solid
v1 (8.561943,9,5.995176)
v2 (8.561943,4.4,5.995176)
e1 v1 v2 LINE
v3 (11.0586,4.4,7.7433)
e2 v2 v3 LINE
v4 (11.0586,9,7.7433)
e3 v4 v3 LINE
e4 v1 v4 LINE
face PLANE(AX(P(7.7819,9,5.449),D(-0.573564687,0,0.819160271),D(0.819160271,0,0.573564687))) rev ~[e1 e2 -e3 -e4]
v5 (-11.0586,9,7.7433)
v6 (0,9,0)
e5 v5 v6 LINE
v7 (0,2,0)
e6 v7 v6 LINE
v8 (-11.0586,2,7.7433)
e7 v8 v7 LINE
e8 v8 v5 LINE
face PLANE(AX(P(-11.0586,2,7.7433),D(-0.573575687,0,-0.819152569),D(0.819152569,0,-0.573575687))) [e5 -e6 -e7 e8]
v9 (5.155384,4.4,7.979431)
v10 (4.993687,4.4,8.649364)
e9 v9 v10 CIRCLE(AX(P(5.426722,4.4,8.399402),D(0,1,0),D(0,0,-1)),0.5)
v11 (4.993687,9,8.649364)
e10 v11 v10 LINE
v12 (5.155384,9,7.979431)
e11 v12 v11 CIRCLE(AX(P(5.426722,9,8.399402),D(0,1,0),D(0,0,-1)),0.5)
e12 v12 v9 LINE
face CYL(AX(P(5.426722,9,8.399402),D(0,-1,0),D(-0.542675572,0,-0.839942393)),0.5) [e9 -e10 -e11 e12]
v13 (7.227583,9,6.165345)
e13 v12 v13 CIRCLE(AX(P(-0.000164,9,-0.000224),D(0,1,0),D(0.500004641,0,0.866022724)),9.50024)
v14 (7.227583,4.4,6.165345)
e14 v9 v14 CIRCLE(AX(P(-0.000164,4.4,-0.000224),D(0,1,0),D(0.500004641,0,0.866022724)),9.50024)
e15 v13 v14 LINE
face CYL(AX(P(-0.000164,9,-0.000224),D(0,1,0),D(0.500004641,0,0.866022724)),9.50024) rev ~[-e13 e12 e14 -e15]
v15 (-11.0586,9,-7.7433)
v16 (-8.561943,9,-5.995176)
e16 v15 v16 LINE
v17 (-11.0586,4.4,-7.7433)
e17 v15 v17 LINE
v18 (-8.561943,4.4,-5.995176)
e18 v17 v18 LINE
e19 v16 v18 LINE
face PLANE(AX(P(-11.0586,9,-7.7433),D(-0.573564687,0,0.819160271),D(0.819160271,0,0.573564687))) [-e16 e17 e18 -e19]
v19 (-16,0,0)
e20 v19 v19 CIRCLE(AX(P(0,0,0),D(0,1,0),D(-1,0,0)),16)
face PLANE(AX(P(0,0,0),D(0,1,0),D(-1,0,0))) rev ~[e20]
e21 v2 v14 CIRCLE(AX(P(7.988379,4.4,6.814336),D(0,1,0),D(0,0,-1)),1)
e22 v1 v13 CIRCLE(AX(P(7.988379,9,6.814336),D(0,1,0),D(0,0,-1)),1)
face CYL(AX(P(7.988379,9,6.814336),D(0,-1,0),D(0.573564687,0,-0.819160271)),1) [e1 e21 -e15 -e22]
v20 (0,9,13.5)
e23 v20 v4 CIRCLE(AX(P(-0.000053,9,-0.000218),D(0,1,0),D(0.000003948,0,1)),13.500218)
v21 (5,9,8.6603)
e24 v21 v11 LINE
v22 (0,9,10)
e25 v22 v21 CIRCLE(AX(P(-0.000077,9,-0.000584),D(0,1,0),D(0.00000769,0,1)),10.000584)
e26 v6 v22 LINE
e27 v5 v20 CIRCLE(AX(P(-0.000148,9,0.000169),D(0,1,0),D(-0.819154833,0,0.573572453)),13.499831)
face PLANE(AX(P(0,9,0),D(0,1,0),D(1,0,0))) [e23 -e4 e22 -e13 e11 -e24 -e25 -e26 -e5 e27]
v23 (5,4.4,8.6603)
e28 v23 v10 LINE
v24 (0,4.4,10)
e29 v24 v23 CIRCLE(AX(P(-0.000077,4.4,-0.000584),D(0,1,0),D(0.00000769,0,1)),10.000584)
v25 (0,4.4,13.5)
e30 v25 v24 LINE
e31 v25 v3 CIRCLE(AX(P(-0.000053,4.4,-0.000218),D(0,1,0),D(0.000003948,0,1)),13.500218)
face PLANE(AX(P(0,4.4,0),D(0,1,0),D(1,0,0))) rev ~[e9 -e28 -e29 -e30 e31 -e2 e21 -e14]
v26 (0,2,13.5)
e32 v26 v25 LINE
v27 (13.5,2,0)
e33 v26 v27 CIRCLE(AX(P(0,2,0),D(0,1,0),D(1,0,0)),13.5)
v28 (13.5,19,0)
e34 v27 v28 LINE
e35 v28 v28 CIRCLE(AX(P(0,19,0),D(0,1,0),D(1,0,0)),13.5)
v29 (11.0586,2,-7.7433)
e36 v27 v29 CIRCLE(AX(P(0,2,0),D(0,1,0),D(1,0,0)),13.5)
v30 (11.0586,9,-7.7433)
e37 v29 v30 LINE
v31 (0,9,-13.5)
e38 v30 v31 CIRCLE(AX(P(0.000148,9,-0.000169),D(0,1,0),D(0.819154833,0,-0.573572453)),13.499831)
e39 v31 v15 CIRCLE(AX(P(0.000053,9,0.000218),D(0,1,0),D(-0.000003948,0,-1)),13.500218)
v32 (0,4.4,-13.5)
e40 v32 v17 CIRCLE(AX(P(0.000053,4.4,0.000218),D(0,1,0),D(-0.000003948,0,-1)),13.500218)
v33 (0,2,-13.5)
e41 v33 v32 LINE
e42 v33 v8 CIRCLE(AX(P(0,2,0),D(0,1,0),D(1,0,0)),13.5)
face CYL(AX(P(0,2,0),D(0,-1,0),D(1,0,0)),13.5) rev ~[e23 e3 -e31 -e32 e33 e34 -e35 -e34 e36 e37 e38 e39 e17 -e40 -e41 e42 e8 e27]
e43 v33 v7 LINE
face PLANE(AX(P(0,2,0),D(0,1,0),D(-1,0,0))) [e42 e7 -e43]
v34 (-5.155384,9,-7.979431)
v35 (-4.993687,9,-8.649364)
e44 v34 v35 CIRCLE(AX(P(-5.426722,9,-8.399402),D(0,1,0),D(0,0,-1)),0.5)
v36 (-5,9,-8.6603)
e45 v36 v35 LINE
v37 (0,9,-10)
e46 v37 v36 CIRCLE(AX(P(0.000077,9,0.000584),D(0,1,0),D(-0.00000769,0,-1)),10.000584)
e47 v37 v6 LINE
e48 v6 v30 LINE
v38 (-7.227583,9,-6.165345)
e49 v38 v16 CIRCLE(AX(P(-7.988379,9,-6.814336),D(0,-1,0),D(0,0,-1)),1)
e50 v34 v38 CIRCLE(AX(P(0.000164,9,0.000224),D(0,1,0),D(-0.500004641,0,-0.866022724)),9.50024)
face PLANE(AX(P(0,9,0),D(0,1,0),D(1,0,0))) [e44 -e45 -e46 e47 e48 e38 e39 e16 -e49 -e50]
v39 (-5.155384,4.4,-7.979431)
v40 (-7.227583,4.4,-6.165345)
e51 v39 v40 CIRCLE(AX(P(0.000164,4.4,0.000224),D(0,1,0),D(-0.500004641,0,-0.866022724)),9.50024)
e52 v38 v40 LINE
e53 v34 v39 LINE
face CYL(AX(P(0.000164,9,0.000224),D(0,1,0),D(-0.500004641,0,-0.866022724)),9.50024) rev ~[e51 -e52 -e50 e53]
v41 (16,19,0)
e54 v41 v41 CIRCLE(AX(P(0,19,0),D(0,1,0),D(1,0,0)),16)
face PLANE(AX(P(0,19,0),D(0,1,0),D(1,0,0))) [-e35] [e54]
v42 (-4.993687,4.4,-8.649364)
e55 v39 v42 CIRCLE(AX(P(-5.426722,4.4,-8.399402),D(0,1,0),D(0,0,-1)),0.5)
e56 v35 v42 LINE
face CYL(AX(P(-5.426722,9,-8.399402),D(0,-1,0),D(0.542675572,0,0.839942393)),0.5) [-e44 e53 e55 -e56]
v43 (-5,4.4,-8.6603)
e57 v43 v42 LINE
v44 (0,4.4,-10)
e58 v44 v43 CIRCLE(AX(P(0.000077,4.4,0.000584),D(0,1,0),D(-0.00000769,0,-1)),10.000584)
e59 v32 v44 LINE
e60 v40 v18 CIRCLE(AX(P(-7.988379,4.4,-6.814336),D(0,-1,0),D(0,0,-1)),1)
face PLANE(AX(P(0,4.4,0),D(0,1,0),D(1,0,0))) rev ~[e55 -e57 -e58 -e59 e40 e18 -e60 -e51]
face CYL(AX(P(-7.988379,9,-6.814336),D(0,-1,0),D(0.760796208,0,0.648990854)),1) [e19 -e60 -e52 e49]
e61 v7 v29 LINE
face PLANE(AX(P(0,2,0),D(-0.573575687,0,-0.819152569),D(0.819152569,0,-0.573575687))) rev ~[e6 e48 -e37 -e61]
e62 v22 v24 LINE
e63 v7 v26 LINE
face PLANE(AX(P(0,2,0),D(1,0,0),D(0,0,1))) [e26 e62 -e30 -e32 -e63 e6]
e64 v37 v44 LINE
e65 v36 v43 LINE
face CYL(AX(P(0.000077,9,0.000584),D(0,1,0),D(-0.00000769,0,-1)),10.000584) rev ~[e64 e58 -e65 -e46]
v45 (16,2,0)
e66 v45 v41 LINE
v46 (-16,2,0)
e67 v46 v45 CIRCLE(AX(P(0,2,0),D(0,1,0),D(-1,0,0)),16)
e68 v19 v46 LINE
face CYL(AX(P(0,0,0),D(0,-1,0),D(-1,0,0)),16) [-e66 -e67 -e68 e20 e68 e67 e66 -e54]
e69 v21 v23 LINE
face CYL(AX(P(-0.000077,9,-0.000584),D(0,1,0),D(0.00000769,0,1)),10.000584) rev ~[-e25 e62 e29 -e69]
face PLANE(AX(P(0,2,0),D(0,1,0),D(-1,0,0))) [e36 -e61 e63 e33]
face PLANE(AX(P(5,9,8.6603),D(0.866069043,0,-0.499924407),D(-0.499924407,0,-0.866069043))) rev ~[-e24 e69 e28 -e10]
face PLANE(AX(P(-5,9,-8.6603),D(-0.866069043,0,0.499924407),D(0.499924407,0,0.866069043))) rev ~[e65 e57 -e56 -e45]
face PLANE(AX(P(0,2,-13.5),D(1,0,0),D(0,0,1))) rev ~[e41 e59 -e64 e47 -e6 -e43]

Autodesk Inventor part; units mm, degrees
ref_plane "YZ Plane" through (0, 0, 0) normal (1, 0, 0) x (0, 1, 0)
ref_plane "XZ Plane" through (0, 0, 0) normal (0, 1, 0) x (-1, 0, 0)
ref_plane "XY Plane" through (0, 0, 0) normal (0, 0, 1) x (1, 0, 0)
sketch "スケッチ1" plane through (0, 0, 0) normal (0, 1, 0) x (-1, 0, 0)
  circle A0 centre (0, 0) radius 16
  dimension "d0" = 32
extrude "押し出し1" add sketch "スケッチ1" along normal blind 2
sketch "スケッチ2" plane through (0, 2, 0) normal (0, 1, 0) x (1, 0, 0)
  circle A0 centre (0, 0) radius 16
  circle A1 centre (0, 0) radius 13.5
  dimension "d3" = 32
  dimension "d4" = 27
extrude "押し出し2" add sketch "スケッチ2" along normal blind 17
sketch "スケッチ3" plane through (0, 2, 0) normal (0, 1, 0) x (1, 0, 0)
  arc A0 (-11.0586, -7.7433) -> (0, -13.5) centre (0, 0) ccw
  line L0 (0, 0) -> (-11.0586, -7.7433) construction
  line L1 (0, 0) -> (0, -13.5) construction
  arc A1 (11.0586, 7.7433) -> (0, 13.5) centre (0, 0) ccw
  line L2 (0, 0) -> (11.0586, 7.7433) construction
  line L3 (0, 0) -> (0, 13.5) construction
  circle A2 centre (0, 0) radius 13.5 projected
  line L4 (-11.0586, -7.7433) -> (0, 0)
  line L5 (0, 0) -> (0, -13.5)
  line L6 (0, 13.5) -> (0, 0)
  line L7 (0, 0) -> (11.0586, 7.7433)
  dimension "d7" = 13.5
  dimension "d8" = 55
  dimension "d9" = 13.5
  dimension "d10" = 55
extrude "押し出し3" add sketch "スケッチ3" along normal blind 7 contours L4 L5 A0 | A1 L7 L6
sketch "スケッチ4" plane through (0, 9, 0) normal (0, 1, 0) x (1, 0, 0)
  line L0 (0, -13.5) -> (0, 0) projected
  arc A0 (0, -13.5) -> (11.0586, -7.7433) centre (0, 0) ccw
  line L1 (0, 0) -> (11.0586, -7.7433) construction
  line L2 (0, 0) -> (0, -13.5) construction
  line L3 (0, 0) -> (-11.0586, -7.7433) projected
  arc A1 (0, -10) -> (5, -8.6603) centre (0, 0) ccw
  line L4 (0, 0) -> (5, -8.6603) construction
  line L5 (0, 0) -> (0, -10) construction
  arc A2 (4.75, -8.2272) -> (7.7819, -5.449) centre (0, 0) ccw
  line L6 (0, 0) -> (7.7819, -5.449) construction
  line L7 (0, 0) -> (4.75, -8.2272) construction
  line L8 (0, -13.5) -> (0, -10)
  line L9 (5, -8.6603) -> (4.75, -8.2272)
  line L10 (7.7819, -5.449) -> (11.0586, -7.7433)
  dimension "d13" = 13.5
  dimension "d14" = 55
  dimension "d15" = 10
  dimension "d16" = 30
  dimension "d17" = 9.5
  dimension "d18" = 25
sketch "スケッチ5" plane through (0, 9, 0) normal (0, 1, 0) x (1, 0, 0)
  line L0 (0, -13.5) -> (0, 0) projected
  line L1 (0, 13.5) -> (0, 0) projected
  arc A0 (0, 13.5) -> (-11.0586, 7.7433) centre (0, 0) ccw
  line L2 (0, 0) -> (-11.0586, 7.7433) construction
  line L3 (0, 0) -> (0, 13.5) construction
  line L4 (0, 0) -> (-11.0586, -7.7433) projected
  arc A1 (0, 10) -> (-5, 8.6603) centre (0, 0) ccw
  line L5 (0, 0) -> (-5, 8.6603) construction
  line L6 (0, 0) -> (0, 10) construction
  arc A2 (-4.75, 8.2272) -> (-7.7819, 5.449) centre (0, 0) ccw
  line L7 (0, 0) -> (-7.7819, 5.449) construction
  line L8 (0, 0) -> (-4.75, 8.2272) construction
  line L9 (0, 13.5) -> (0, 10)
  line L10 (-5, 8.6603) -> (-4.75, 8.2272)
  line L11 (-11.0586, 7.7433) -> (-7.7819, 5.449)
  dimension "d21" = 13.5
  dimension "d22" = 55
  dimension "d23" = 10
  dimension "d24" = 30
  dimension "d25" = 9.5
  dimension "d26" = 25
extrude "押し出し4" add sketch "スケッチ4" against normal blind 4.6
extrude "押し出し5" add sketch "スケッチ5" against normal blind 4.6
fillet "フィレット1" radius 1 2 edges at (-7.7819, 6.7, -5.449) (7.7819, 6.7, 5.449)
fillet "フィレット2" radius 0.5 1 edges at (-4.75, 6.7, -8.2272)
fillet "フィレット3" radius 0.5 1 edges at (4.75, 6.7, 8.2272)
properties part number "kumi4-2"
